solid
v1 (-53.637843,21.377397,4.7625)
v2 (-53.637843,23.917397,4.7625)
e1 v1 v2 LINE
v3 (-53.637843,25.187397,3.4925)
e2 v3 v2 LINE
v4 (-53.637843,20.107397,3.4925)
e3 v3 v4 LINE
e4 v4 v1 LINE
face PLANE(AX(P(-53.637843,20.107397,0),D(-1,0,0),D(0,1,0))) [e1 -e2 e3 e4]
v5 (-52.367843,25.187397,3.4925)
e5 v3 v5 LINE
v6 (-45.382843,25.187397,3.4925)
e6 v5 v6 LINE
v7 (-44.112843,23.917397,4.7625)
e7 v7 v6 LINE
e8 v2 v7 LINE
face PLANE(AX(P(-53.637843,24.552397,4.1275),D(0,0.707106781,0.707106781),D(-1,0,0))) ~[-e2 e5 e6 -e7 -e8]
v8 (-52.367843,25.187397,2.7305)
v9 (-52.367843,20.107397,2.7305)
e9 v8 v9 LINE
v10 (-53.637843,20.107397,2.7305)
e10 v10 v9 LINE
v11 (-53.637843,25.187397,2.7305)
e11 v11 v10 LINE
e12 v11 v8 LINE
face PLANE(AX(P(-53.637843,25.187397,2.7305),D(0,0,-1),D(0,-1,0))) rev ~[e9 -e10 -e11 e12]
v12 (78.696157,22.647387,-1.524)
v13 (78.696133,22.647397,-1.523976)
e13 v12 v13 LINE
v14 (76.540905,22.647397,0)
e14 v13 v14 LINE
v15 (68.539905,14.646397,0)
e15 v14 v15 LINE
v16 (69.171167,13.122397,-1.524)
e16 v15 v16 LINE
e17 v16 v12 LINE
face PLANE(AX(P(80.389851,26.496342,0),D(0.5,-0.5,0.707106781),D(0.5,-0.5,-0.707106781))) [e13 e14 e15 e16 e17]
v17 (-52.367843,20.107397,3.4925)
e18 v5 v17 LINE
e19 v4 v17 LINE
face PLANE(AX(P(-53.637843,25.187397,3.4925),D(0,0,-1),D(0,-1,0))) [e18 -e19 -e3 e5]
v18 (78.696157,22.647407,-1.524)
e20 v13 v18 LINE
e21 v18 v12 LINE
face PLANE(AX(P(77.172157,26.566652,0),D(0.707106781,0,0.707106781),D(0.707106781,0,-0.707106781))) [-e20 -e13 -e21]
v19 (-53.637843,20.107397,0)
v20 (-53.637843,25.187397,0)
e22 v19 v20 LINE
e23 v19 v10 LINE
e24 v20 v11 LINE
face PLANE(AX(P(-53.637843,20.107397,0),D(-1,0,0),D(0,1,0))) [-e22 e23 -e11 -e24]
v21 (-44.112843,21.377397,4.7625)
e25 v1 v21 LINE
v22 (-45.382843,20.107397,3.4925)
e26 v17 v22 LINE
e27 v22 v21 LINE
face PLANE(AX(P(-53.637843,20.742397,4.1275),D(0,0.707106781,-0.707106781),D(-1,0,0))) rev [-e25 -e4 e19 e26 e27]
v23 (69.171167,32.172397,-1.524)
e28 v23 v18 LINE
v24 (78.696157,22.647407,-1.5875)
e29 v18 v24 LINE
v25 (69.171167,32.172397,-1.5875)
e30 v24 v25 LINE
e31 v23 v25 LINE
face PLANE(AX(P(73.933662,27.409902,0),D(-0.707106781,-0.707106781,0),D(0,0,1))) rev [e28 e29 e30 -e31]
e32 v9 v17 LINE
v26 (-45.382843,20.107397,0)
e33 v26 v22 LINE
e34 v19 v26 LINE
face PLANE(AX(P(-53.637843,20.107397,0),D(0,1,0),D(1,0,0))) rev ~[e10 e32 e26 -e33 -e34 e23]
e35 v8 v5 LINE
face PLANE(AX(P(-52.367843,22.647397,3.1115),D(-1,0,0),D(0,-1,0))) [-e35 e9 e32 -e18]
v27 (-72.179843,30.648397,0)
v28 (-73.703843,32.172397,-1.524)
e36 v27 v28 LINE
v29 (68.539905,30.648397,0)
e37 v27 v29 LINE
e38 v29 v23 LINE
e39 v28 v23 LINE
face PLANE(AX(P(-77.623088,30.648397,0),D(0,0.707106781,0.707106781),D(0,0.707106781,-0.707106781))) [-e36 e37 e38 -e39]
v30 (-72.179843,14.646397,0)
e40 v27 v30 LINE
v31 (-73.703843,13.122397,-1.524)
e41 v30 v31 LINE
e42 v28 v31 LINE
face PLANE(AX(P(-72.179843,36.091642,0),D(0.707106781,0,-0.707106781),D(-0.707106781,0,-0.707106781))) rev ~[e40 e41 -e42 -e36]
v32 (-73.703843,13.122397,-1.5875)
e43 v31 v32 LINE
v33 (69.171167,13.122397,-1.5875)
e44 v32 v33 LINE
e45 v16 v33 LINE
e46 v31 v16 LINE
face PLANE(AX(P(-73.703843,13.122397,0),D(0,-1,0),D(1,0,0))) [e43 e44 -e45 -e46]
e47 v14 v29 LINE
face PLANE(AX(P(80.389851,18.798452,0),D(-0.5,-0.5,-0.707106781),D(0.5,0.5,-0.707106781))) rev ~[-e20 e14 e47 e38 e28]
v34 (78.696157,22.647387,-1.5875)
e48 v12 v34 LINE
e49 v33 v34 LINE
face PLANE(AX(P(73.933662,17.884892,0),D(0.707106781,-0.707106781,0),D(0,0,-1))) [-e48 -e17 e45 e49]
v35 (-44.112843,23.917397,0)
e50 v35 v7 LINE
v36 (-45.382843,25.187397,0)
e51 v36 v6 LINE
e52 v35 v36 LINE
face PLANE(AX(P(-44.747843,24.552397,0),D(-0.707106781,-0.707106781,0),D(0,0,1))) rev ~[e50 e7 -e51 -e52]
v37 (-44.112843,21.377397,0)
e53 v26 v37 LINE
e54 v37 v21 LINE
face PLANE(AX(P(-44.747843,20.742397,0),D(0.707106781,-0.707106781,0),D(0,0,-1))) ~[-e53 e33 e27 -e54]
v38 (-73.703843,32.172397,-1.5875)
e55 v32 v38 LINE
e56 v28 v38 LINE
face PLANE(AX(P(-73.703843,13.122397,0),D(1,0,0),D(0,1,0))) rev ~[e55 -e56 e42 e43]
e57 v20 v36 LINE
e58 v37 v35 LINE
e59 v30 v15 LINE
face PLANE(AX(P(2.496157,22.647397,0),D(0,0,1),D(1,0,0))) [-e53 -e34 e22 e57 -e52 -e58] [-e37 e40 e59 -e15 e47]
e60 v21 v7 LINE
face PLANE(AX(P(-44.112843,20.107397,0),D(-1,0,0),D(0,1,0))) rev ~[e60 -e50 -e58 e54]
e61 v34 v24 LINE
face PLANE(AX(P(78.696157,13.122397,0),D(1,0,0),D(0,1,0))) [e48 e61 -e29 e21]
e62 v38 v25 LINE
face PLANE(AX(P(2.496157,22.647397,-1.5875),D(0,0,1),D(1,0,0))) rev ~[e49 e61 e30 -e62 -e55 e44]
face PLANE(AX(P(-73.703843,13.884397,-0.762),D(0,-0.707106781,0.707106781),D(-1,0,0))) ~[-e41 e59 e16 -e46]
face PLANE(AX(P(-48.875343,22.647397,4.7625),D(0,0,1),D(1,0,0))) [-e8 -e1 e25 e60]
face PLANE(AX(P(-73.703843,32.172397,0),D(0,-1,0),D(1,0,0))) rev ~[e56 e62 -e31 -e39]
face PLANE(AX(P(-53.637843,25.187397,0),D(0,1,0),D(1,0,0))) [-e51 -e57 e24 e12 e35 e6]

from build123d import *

# Parameters (mm, degrees)
F0_W         = 152.4
F0_H         = 19.05
F1_DEPTH     = 1.5875
F2_SIZE      = 9.52499
F3_W         = 9.525
F3_H         = 5.08
F4_DEPTH     = 4.7625
F5_SIZE      = 1.27
F6_W         = 5.08
F6_H         = 0.762
F7_DEPTH     = 1.27
F8_SIZE      = 1.524
F9_T1_DEPTH  = 19.1535983177
F9_T3_DEPTH  = 7.8385097473
F9_T5_DEPTH  = 21.3088597868
F9_T7_DEPTH  = 150.7134997473
F9_T9_DEPTH  = 25.3644897473
F9_T14_DEPTH = 9.4899593576
F9_T19_DEPTH = 9.4899593576
F9_T24_DEPTH = 9.4899593576
F9_T29_DEPTH = 9.4899593576


# Not quite as in the source:
# - a fillet or chamfer that OpenCascade refuses, or shapes differently, is made with other operations: its cross-section is extruded or revolved along the edge and cut away or added
# - two fillets or chamfers of one size are made in one step
# - a fillet or chamfer is up to 0.001 mm smaller than in the source, because OpenCascade refuses the exact size


with BuildPart() as f1:
    # F0 (on Top) → F1 (new body)
    with BuildSketch(Plane.XY):
        with Locations((2.4961568415, 22.6473969003)):
            Rectangle(F0_W, F0_H)
    extrude(amount=-F1_DEPTH)

    # F2 (size 9.525 in the source; OpenCascade refuses exactly that, so slightly less here)
    f2_edges = [f1.edges().sort_by_distance(p)[0] for p in [
        (78.696157, 13.122397, -0.79375),
        (78.696157, 32.172397, -0.79375),
    ]]
    chamfer(f2_edges, length=F2_SIZE)

    # F3 (on face) → F4 (join)
    with BuildSketch(Plane.XY):
        with Locations((-48.8753431585, 22.6473969003)):
            Rectangle(F3_W, F3_H)
    extrude(amount=F4_DEPTH)

    # F5
    f5_edges = [f1.edges().sort_by_distance(p)[0] for p in [
        (-44.112843, 20.107397, 2.38125),
        (-44.112843, 25.187397, 2.38125),
        (-48.875343, 25.187397, 4.7625),
        (-48.875343, 20.107397, 4.7625),
    ]]
    chamfer(f5_edges, length=F5_SIZE)

    # F6 (on face) → F7 (cut)
    with BuildSketch(Plane(origin=(-53.6378431585, 0, 0), x_dir=(0, -1, 0), z_dir=(-1, 0, 0))):
        with Locations((-22.6473969003, 3.1115)):
            Rectangle(F6_W, F6_H)
    extrude(amount=-F7_DEPTH, mode=Mode.SUBTRACT)

    # F8
    f8_edges = [f1.edges().sort_by_distance(p)[0] for p in [
        (-2.266338, 13.122397, 0),
    ]]
    chamfer(f8_edges, length=F8_SIZE)

    # F9: chamfer of 1.524 on 7 edges, made by hand

    # F9_s2 → F9_t1 (cut)
    with BuildSketch(Plane(origin=(53.4430964982, 53.4430964982, 0), x_dir=(0, 0, 1), z_dir=(-0.7071067812, -0.7071067812, 0))):
        Polygon((0, -38.1084653026), (-1.524, -39.6324653026), (0, -39.6324653026), align=None)
    extrude(amount=F9_T1_DEPTH, mode=Mode.SUBTRACT)

    # F9_s4 → F9_t3 (cut)
    with BuildSketch(Plane.XZ.offset(-26.566651774)):
        Polygon((77.1721568415, 0), (78.6961568415, -1.524), (78.6961568415, 0), align=None)
    extrude(amount=F9_T3_DEPTH, mode=Mode.SUBTRACT)

    # F9_s6 → F9_t5 (cut)
    with BuildSketch(Plane(origin=(30.7956995979, -30.7956995979, 0), x_dir=(0, 0, 1), z_dir=(-0.7071067812, 0.7071067812, 0))):
        Polygon((0, 70.1367211515), (-1.524, 71.6607211515), (0, 71.6607211515), align=None)
    extrude(amount=F9_T5_DEPTH, mode=Mode.SUBTRACT)

    # F9_s8 → F9_t7 (cut)
    with BuildSketch(Plane.YZ.offset(-77.6230880321)):
        Polygon((30.6483969003, 0), (32.1723969003, -1.524), (32.1723969003, 0), align=None)
    extrude(amount=F9_T7_DEPTH, mode=Mode.SUBTRACT)

    # F9_s10 → F9_t9 (cut)
    with BuildSketch(Plane.XZ.offset(-36.091641774)):
        Polygon((-72.1798431585, 0), (-73.7038431585, -1.524), (-73.7038431585, 0), align=None)
    extrude(amount=F9_T9_DEPTH, mode=Mode.SUBTRACT)


with BuildPart() as f9_tool12:
    # F9_s13 → F9_t14 (new body)
    with BuildSketch(Plane.XY.offset(3.9512296788)):
        Polygon((77.618526107, 21.5697561658), (78.6961568415, 24.1713869003), (78.6961568415, 22.6473869003), align=None)
    extrude(amount=-F9_T14_DEPTH)

    split(bisect_by=Plane(origin=(38.5860784208, 0, 38.5860784208), x_dir=(0, 1, 0), z_dir=(0.7071067812, 0, 0.7071067812)), keep=Keep.TOP)


with BuildPart() as f1_1:
    add(f1.part)

    # F9_t11: cut F9_tool12
    add(f9_tool12.part, mode=Mode.SUBTRACT)


with BuildPart() as f9_tool17:
    # F9_s18 → F9_t19 (new body)
    with BuildSketch(Plane.XY.offset(3.9512296788)):
        Polygon((77.618526107, 21.5697561658), (78.6961568415, 24.1713869003), (78.6961568415, 22.6473869003), align=None)
    extrude(amount=-F9_T19_DEPTH)

    split(bisect_by=Plane(origin=(13.473377118, -13.473377118, 19.0542326513), x_dir=(0.7071067812, 0.7071067812, 0), z_dir=(0.5, -0.5, 0.7071067812)), keep=Keep.TOP)


with BuildPart() as f1_2:
    add(f1_1.part)

    # F9_t16: cut F9_tool17
    add(f9_tool17.part, mode=Mode.SUBTRACT)


with BuildPart() as f9_tool22:
    # F9_s23 → F9_t24 (new body)
    with BuildSketch(Plane.XY.offset(3.9512296788)):
        Polygon((78.6961568415, 21.1234069003), (77.618526107, 23.7250376349), (78.6961568415, 22.6474069003), align=None)
    extrude(amount=-F9_T24_DEPTH)

    split(bisect_by=Plane(origin=(24.7970755682, 24.7970755682, 35.0683605757), x_dir=(-0.7071067812, 0.7071067812, 0), z_dir=(0.5, 0.5, 0.7071067812)), keep=Keep.TOP)


with BuildPart() as f1_3:
    add(f1_2.part)

    # F9_t21: cut F9_tool22
    add(f9_tool22.part, mode=Mode.SUBTRACT)


with BuildPart() as f9_tool27:
    # F9_s28 → F9_t29 (new body)
    with BuildSketch(Plane.XY.offset(3.9512296788)):
        Polygon((78.6961568415, 21.1234069003), (77.618526107, 23.7250376349), (78.6961568415, 22.6474069003), align=None)
    extrude(amount=-F9_T29_DEPTH)

    split(bisect_by=Plane(origin=(38.5860784208, 0, 38.5860784208), x_dir=(0, 1, 0), z_dir=(0.7071067812, 0, 0.7071067812)), keep=Keep.TOP)


with BuildPart() as f1_4:
    add(f1_3.part)

    # F9_t26: cut F9_tool27
    add(f9_tool27.part, mode=Mode.SUBTRACT)


solid = f1_4.part
